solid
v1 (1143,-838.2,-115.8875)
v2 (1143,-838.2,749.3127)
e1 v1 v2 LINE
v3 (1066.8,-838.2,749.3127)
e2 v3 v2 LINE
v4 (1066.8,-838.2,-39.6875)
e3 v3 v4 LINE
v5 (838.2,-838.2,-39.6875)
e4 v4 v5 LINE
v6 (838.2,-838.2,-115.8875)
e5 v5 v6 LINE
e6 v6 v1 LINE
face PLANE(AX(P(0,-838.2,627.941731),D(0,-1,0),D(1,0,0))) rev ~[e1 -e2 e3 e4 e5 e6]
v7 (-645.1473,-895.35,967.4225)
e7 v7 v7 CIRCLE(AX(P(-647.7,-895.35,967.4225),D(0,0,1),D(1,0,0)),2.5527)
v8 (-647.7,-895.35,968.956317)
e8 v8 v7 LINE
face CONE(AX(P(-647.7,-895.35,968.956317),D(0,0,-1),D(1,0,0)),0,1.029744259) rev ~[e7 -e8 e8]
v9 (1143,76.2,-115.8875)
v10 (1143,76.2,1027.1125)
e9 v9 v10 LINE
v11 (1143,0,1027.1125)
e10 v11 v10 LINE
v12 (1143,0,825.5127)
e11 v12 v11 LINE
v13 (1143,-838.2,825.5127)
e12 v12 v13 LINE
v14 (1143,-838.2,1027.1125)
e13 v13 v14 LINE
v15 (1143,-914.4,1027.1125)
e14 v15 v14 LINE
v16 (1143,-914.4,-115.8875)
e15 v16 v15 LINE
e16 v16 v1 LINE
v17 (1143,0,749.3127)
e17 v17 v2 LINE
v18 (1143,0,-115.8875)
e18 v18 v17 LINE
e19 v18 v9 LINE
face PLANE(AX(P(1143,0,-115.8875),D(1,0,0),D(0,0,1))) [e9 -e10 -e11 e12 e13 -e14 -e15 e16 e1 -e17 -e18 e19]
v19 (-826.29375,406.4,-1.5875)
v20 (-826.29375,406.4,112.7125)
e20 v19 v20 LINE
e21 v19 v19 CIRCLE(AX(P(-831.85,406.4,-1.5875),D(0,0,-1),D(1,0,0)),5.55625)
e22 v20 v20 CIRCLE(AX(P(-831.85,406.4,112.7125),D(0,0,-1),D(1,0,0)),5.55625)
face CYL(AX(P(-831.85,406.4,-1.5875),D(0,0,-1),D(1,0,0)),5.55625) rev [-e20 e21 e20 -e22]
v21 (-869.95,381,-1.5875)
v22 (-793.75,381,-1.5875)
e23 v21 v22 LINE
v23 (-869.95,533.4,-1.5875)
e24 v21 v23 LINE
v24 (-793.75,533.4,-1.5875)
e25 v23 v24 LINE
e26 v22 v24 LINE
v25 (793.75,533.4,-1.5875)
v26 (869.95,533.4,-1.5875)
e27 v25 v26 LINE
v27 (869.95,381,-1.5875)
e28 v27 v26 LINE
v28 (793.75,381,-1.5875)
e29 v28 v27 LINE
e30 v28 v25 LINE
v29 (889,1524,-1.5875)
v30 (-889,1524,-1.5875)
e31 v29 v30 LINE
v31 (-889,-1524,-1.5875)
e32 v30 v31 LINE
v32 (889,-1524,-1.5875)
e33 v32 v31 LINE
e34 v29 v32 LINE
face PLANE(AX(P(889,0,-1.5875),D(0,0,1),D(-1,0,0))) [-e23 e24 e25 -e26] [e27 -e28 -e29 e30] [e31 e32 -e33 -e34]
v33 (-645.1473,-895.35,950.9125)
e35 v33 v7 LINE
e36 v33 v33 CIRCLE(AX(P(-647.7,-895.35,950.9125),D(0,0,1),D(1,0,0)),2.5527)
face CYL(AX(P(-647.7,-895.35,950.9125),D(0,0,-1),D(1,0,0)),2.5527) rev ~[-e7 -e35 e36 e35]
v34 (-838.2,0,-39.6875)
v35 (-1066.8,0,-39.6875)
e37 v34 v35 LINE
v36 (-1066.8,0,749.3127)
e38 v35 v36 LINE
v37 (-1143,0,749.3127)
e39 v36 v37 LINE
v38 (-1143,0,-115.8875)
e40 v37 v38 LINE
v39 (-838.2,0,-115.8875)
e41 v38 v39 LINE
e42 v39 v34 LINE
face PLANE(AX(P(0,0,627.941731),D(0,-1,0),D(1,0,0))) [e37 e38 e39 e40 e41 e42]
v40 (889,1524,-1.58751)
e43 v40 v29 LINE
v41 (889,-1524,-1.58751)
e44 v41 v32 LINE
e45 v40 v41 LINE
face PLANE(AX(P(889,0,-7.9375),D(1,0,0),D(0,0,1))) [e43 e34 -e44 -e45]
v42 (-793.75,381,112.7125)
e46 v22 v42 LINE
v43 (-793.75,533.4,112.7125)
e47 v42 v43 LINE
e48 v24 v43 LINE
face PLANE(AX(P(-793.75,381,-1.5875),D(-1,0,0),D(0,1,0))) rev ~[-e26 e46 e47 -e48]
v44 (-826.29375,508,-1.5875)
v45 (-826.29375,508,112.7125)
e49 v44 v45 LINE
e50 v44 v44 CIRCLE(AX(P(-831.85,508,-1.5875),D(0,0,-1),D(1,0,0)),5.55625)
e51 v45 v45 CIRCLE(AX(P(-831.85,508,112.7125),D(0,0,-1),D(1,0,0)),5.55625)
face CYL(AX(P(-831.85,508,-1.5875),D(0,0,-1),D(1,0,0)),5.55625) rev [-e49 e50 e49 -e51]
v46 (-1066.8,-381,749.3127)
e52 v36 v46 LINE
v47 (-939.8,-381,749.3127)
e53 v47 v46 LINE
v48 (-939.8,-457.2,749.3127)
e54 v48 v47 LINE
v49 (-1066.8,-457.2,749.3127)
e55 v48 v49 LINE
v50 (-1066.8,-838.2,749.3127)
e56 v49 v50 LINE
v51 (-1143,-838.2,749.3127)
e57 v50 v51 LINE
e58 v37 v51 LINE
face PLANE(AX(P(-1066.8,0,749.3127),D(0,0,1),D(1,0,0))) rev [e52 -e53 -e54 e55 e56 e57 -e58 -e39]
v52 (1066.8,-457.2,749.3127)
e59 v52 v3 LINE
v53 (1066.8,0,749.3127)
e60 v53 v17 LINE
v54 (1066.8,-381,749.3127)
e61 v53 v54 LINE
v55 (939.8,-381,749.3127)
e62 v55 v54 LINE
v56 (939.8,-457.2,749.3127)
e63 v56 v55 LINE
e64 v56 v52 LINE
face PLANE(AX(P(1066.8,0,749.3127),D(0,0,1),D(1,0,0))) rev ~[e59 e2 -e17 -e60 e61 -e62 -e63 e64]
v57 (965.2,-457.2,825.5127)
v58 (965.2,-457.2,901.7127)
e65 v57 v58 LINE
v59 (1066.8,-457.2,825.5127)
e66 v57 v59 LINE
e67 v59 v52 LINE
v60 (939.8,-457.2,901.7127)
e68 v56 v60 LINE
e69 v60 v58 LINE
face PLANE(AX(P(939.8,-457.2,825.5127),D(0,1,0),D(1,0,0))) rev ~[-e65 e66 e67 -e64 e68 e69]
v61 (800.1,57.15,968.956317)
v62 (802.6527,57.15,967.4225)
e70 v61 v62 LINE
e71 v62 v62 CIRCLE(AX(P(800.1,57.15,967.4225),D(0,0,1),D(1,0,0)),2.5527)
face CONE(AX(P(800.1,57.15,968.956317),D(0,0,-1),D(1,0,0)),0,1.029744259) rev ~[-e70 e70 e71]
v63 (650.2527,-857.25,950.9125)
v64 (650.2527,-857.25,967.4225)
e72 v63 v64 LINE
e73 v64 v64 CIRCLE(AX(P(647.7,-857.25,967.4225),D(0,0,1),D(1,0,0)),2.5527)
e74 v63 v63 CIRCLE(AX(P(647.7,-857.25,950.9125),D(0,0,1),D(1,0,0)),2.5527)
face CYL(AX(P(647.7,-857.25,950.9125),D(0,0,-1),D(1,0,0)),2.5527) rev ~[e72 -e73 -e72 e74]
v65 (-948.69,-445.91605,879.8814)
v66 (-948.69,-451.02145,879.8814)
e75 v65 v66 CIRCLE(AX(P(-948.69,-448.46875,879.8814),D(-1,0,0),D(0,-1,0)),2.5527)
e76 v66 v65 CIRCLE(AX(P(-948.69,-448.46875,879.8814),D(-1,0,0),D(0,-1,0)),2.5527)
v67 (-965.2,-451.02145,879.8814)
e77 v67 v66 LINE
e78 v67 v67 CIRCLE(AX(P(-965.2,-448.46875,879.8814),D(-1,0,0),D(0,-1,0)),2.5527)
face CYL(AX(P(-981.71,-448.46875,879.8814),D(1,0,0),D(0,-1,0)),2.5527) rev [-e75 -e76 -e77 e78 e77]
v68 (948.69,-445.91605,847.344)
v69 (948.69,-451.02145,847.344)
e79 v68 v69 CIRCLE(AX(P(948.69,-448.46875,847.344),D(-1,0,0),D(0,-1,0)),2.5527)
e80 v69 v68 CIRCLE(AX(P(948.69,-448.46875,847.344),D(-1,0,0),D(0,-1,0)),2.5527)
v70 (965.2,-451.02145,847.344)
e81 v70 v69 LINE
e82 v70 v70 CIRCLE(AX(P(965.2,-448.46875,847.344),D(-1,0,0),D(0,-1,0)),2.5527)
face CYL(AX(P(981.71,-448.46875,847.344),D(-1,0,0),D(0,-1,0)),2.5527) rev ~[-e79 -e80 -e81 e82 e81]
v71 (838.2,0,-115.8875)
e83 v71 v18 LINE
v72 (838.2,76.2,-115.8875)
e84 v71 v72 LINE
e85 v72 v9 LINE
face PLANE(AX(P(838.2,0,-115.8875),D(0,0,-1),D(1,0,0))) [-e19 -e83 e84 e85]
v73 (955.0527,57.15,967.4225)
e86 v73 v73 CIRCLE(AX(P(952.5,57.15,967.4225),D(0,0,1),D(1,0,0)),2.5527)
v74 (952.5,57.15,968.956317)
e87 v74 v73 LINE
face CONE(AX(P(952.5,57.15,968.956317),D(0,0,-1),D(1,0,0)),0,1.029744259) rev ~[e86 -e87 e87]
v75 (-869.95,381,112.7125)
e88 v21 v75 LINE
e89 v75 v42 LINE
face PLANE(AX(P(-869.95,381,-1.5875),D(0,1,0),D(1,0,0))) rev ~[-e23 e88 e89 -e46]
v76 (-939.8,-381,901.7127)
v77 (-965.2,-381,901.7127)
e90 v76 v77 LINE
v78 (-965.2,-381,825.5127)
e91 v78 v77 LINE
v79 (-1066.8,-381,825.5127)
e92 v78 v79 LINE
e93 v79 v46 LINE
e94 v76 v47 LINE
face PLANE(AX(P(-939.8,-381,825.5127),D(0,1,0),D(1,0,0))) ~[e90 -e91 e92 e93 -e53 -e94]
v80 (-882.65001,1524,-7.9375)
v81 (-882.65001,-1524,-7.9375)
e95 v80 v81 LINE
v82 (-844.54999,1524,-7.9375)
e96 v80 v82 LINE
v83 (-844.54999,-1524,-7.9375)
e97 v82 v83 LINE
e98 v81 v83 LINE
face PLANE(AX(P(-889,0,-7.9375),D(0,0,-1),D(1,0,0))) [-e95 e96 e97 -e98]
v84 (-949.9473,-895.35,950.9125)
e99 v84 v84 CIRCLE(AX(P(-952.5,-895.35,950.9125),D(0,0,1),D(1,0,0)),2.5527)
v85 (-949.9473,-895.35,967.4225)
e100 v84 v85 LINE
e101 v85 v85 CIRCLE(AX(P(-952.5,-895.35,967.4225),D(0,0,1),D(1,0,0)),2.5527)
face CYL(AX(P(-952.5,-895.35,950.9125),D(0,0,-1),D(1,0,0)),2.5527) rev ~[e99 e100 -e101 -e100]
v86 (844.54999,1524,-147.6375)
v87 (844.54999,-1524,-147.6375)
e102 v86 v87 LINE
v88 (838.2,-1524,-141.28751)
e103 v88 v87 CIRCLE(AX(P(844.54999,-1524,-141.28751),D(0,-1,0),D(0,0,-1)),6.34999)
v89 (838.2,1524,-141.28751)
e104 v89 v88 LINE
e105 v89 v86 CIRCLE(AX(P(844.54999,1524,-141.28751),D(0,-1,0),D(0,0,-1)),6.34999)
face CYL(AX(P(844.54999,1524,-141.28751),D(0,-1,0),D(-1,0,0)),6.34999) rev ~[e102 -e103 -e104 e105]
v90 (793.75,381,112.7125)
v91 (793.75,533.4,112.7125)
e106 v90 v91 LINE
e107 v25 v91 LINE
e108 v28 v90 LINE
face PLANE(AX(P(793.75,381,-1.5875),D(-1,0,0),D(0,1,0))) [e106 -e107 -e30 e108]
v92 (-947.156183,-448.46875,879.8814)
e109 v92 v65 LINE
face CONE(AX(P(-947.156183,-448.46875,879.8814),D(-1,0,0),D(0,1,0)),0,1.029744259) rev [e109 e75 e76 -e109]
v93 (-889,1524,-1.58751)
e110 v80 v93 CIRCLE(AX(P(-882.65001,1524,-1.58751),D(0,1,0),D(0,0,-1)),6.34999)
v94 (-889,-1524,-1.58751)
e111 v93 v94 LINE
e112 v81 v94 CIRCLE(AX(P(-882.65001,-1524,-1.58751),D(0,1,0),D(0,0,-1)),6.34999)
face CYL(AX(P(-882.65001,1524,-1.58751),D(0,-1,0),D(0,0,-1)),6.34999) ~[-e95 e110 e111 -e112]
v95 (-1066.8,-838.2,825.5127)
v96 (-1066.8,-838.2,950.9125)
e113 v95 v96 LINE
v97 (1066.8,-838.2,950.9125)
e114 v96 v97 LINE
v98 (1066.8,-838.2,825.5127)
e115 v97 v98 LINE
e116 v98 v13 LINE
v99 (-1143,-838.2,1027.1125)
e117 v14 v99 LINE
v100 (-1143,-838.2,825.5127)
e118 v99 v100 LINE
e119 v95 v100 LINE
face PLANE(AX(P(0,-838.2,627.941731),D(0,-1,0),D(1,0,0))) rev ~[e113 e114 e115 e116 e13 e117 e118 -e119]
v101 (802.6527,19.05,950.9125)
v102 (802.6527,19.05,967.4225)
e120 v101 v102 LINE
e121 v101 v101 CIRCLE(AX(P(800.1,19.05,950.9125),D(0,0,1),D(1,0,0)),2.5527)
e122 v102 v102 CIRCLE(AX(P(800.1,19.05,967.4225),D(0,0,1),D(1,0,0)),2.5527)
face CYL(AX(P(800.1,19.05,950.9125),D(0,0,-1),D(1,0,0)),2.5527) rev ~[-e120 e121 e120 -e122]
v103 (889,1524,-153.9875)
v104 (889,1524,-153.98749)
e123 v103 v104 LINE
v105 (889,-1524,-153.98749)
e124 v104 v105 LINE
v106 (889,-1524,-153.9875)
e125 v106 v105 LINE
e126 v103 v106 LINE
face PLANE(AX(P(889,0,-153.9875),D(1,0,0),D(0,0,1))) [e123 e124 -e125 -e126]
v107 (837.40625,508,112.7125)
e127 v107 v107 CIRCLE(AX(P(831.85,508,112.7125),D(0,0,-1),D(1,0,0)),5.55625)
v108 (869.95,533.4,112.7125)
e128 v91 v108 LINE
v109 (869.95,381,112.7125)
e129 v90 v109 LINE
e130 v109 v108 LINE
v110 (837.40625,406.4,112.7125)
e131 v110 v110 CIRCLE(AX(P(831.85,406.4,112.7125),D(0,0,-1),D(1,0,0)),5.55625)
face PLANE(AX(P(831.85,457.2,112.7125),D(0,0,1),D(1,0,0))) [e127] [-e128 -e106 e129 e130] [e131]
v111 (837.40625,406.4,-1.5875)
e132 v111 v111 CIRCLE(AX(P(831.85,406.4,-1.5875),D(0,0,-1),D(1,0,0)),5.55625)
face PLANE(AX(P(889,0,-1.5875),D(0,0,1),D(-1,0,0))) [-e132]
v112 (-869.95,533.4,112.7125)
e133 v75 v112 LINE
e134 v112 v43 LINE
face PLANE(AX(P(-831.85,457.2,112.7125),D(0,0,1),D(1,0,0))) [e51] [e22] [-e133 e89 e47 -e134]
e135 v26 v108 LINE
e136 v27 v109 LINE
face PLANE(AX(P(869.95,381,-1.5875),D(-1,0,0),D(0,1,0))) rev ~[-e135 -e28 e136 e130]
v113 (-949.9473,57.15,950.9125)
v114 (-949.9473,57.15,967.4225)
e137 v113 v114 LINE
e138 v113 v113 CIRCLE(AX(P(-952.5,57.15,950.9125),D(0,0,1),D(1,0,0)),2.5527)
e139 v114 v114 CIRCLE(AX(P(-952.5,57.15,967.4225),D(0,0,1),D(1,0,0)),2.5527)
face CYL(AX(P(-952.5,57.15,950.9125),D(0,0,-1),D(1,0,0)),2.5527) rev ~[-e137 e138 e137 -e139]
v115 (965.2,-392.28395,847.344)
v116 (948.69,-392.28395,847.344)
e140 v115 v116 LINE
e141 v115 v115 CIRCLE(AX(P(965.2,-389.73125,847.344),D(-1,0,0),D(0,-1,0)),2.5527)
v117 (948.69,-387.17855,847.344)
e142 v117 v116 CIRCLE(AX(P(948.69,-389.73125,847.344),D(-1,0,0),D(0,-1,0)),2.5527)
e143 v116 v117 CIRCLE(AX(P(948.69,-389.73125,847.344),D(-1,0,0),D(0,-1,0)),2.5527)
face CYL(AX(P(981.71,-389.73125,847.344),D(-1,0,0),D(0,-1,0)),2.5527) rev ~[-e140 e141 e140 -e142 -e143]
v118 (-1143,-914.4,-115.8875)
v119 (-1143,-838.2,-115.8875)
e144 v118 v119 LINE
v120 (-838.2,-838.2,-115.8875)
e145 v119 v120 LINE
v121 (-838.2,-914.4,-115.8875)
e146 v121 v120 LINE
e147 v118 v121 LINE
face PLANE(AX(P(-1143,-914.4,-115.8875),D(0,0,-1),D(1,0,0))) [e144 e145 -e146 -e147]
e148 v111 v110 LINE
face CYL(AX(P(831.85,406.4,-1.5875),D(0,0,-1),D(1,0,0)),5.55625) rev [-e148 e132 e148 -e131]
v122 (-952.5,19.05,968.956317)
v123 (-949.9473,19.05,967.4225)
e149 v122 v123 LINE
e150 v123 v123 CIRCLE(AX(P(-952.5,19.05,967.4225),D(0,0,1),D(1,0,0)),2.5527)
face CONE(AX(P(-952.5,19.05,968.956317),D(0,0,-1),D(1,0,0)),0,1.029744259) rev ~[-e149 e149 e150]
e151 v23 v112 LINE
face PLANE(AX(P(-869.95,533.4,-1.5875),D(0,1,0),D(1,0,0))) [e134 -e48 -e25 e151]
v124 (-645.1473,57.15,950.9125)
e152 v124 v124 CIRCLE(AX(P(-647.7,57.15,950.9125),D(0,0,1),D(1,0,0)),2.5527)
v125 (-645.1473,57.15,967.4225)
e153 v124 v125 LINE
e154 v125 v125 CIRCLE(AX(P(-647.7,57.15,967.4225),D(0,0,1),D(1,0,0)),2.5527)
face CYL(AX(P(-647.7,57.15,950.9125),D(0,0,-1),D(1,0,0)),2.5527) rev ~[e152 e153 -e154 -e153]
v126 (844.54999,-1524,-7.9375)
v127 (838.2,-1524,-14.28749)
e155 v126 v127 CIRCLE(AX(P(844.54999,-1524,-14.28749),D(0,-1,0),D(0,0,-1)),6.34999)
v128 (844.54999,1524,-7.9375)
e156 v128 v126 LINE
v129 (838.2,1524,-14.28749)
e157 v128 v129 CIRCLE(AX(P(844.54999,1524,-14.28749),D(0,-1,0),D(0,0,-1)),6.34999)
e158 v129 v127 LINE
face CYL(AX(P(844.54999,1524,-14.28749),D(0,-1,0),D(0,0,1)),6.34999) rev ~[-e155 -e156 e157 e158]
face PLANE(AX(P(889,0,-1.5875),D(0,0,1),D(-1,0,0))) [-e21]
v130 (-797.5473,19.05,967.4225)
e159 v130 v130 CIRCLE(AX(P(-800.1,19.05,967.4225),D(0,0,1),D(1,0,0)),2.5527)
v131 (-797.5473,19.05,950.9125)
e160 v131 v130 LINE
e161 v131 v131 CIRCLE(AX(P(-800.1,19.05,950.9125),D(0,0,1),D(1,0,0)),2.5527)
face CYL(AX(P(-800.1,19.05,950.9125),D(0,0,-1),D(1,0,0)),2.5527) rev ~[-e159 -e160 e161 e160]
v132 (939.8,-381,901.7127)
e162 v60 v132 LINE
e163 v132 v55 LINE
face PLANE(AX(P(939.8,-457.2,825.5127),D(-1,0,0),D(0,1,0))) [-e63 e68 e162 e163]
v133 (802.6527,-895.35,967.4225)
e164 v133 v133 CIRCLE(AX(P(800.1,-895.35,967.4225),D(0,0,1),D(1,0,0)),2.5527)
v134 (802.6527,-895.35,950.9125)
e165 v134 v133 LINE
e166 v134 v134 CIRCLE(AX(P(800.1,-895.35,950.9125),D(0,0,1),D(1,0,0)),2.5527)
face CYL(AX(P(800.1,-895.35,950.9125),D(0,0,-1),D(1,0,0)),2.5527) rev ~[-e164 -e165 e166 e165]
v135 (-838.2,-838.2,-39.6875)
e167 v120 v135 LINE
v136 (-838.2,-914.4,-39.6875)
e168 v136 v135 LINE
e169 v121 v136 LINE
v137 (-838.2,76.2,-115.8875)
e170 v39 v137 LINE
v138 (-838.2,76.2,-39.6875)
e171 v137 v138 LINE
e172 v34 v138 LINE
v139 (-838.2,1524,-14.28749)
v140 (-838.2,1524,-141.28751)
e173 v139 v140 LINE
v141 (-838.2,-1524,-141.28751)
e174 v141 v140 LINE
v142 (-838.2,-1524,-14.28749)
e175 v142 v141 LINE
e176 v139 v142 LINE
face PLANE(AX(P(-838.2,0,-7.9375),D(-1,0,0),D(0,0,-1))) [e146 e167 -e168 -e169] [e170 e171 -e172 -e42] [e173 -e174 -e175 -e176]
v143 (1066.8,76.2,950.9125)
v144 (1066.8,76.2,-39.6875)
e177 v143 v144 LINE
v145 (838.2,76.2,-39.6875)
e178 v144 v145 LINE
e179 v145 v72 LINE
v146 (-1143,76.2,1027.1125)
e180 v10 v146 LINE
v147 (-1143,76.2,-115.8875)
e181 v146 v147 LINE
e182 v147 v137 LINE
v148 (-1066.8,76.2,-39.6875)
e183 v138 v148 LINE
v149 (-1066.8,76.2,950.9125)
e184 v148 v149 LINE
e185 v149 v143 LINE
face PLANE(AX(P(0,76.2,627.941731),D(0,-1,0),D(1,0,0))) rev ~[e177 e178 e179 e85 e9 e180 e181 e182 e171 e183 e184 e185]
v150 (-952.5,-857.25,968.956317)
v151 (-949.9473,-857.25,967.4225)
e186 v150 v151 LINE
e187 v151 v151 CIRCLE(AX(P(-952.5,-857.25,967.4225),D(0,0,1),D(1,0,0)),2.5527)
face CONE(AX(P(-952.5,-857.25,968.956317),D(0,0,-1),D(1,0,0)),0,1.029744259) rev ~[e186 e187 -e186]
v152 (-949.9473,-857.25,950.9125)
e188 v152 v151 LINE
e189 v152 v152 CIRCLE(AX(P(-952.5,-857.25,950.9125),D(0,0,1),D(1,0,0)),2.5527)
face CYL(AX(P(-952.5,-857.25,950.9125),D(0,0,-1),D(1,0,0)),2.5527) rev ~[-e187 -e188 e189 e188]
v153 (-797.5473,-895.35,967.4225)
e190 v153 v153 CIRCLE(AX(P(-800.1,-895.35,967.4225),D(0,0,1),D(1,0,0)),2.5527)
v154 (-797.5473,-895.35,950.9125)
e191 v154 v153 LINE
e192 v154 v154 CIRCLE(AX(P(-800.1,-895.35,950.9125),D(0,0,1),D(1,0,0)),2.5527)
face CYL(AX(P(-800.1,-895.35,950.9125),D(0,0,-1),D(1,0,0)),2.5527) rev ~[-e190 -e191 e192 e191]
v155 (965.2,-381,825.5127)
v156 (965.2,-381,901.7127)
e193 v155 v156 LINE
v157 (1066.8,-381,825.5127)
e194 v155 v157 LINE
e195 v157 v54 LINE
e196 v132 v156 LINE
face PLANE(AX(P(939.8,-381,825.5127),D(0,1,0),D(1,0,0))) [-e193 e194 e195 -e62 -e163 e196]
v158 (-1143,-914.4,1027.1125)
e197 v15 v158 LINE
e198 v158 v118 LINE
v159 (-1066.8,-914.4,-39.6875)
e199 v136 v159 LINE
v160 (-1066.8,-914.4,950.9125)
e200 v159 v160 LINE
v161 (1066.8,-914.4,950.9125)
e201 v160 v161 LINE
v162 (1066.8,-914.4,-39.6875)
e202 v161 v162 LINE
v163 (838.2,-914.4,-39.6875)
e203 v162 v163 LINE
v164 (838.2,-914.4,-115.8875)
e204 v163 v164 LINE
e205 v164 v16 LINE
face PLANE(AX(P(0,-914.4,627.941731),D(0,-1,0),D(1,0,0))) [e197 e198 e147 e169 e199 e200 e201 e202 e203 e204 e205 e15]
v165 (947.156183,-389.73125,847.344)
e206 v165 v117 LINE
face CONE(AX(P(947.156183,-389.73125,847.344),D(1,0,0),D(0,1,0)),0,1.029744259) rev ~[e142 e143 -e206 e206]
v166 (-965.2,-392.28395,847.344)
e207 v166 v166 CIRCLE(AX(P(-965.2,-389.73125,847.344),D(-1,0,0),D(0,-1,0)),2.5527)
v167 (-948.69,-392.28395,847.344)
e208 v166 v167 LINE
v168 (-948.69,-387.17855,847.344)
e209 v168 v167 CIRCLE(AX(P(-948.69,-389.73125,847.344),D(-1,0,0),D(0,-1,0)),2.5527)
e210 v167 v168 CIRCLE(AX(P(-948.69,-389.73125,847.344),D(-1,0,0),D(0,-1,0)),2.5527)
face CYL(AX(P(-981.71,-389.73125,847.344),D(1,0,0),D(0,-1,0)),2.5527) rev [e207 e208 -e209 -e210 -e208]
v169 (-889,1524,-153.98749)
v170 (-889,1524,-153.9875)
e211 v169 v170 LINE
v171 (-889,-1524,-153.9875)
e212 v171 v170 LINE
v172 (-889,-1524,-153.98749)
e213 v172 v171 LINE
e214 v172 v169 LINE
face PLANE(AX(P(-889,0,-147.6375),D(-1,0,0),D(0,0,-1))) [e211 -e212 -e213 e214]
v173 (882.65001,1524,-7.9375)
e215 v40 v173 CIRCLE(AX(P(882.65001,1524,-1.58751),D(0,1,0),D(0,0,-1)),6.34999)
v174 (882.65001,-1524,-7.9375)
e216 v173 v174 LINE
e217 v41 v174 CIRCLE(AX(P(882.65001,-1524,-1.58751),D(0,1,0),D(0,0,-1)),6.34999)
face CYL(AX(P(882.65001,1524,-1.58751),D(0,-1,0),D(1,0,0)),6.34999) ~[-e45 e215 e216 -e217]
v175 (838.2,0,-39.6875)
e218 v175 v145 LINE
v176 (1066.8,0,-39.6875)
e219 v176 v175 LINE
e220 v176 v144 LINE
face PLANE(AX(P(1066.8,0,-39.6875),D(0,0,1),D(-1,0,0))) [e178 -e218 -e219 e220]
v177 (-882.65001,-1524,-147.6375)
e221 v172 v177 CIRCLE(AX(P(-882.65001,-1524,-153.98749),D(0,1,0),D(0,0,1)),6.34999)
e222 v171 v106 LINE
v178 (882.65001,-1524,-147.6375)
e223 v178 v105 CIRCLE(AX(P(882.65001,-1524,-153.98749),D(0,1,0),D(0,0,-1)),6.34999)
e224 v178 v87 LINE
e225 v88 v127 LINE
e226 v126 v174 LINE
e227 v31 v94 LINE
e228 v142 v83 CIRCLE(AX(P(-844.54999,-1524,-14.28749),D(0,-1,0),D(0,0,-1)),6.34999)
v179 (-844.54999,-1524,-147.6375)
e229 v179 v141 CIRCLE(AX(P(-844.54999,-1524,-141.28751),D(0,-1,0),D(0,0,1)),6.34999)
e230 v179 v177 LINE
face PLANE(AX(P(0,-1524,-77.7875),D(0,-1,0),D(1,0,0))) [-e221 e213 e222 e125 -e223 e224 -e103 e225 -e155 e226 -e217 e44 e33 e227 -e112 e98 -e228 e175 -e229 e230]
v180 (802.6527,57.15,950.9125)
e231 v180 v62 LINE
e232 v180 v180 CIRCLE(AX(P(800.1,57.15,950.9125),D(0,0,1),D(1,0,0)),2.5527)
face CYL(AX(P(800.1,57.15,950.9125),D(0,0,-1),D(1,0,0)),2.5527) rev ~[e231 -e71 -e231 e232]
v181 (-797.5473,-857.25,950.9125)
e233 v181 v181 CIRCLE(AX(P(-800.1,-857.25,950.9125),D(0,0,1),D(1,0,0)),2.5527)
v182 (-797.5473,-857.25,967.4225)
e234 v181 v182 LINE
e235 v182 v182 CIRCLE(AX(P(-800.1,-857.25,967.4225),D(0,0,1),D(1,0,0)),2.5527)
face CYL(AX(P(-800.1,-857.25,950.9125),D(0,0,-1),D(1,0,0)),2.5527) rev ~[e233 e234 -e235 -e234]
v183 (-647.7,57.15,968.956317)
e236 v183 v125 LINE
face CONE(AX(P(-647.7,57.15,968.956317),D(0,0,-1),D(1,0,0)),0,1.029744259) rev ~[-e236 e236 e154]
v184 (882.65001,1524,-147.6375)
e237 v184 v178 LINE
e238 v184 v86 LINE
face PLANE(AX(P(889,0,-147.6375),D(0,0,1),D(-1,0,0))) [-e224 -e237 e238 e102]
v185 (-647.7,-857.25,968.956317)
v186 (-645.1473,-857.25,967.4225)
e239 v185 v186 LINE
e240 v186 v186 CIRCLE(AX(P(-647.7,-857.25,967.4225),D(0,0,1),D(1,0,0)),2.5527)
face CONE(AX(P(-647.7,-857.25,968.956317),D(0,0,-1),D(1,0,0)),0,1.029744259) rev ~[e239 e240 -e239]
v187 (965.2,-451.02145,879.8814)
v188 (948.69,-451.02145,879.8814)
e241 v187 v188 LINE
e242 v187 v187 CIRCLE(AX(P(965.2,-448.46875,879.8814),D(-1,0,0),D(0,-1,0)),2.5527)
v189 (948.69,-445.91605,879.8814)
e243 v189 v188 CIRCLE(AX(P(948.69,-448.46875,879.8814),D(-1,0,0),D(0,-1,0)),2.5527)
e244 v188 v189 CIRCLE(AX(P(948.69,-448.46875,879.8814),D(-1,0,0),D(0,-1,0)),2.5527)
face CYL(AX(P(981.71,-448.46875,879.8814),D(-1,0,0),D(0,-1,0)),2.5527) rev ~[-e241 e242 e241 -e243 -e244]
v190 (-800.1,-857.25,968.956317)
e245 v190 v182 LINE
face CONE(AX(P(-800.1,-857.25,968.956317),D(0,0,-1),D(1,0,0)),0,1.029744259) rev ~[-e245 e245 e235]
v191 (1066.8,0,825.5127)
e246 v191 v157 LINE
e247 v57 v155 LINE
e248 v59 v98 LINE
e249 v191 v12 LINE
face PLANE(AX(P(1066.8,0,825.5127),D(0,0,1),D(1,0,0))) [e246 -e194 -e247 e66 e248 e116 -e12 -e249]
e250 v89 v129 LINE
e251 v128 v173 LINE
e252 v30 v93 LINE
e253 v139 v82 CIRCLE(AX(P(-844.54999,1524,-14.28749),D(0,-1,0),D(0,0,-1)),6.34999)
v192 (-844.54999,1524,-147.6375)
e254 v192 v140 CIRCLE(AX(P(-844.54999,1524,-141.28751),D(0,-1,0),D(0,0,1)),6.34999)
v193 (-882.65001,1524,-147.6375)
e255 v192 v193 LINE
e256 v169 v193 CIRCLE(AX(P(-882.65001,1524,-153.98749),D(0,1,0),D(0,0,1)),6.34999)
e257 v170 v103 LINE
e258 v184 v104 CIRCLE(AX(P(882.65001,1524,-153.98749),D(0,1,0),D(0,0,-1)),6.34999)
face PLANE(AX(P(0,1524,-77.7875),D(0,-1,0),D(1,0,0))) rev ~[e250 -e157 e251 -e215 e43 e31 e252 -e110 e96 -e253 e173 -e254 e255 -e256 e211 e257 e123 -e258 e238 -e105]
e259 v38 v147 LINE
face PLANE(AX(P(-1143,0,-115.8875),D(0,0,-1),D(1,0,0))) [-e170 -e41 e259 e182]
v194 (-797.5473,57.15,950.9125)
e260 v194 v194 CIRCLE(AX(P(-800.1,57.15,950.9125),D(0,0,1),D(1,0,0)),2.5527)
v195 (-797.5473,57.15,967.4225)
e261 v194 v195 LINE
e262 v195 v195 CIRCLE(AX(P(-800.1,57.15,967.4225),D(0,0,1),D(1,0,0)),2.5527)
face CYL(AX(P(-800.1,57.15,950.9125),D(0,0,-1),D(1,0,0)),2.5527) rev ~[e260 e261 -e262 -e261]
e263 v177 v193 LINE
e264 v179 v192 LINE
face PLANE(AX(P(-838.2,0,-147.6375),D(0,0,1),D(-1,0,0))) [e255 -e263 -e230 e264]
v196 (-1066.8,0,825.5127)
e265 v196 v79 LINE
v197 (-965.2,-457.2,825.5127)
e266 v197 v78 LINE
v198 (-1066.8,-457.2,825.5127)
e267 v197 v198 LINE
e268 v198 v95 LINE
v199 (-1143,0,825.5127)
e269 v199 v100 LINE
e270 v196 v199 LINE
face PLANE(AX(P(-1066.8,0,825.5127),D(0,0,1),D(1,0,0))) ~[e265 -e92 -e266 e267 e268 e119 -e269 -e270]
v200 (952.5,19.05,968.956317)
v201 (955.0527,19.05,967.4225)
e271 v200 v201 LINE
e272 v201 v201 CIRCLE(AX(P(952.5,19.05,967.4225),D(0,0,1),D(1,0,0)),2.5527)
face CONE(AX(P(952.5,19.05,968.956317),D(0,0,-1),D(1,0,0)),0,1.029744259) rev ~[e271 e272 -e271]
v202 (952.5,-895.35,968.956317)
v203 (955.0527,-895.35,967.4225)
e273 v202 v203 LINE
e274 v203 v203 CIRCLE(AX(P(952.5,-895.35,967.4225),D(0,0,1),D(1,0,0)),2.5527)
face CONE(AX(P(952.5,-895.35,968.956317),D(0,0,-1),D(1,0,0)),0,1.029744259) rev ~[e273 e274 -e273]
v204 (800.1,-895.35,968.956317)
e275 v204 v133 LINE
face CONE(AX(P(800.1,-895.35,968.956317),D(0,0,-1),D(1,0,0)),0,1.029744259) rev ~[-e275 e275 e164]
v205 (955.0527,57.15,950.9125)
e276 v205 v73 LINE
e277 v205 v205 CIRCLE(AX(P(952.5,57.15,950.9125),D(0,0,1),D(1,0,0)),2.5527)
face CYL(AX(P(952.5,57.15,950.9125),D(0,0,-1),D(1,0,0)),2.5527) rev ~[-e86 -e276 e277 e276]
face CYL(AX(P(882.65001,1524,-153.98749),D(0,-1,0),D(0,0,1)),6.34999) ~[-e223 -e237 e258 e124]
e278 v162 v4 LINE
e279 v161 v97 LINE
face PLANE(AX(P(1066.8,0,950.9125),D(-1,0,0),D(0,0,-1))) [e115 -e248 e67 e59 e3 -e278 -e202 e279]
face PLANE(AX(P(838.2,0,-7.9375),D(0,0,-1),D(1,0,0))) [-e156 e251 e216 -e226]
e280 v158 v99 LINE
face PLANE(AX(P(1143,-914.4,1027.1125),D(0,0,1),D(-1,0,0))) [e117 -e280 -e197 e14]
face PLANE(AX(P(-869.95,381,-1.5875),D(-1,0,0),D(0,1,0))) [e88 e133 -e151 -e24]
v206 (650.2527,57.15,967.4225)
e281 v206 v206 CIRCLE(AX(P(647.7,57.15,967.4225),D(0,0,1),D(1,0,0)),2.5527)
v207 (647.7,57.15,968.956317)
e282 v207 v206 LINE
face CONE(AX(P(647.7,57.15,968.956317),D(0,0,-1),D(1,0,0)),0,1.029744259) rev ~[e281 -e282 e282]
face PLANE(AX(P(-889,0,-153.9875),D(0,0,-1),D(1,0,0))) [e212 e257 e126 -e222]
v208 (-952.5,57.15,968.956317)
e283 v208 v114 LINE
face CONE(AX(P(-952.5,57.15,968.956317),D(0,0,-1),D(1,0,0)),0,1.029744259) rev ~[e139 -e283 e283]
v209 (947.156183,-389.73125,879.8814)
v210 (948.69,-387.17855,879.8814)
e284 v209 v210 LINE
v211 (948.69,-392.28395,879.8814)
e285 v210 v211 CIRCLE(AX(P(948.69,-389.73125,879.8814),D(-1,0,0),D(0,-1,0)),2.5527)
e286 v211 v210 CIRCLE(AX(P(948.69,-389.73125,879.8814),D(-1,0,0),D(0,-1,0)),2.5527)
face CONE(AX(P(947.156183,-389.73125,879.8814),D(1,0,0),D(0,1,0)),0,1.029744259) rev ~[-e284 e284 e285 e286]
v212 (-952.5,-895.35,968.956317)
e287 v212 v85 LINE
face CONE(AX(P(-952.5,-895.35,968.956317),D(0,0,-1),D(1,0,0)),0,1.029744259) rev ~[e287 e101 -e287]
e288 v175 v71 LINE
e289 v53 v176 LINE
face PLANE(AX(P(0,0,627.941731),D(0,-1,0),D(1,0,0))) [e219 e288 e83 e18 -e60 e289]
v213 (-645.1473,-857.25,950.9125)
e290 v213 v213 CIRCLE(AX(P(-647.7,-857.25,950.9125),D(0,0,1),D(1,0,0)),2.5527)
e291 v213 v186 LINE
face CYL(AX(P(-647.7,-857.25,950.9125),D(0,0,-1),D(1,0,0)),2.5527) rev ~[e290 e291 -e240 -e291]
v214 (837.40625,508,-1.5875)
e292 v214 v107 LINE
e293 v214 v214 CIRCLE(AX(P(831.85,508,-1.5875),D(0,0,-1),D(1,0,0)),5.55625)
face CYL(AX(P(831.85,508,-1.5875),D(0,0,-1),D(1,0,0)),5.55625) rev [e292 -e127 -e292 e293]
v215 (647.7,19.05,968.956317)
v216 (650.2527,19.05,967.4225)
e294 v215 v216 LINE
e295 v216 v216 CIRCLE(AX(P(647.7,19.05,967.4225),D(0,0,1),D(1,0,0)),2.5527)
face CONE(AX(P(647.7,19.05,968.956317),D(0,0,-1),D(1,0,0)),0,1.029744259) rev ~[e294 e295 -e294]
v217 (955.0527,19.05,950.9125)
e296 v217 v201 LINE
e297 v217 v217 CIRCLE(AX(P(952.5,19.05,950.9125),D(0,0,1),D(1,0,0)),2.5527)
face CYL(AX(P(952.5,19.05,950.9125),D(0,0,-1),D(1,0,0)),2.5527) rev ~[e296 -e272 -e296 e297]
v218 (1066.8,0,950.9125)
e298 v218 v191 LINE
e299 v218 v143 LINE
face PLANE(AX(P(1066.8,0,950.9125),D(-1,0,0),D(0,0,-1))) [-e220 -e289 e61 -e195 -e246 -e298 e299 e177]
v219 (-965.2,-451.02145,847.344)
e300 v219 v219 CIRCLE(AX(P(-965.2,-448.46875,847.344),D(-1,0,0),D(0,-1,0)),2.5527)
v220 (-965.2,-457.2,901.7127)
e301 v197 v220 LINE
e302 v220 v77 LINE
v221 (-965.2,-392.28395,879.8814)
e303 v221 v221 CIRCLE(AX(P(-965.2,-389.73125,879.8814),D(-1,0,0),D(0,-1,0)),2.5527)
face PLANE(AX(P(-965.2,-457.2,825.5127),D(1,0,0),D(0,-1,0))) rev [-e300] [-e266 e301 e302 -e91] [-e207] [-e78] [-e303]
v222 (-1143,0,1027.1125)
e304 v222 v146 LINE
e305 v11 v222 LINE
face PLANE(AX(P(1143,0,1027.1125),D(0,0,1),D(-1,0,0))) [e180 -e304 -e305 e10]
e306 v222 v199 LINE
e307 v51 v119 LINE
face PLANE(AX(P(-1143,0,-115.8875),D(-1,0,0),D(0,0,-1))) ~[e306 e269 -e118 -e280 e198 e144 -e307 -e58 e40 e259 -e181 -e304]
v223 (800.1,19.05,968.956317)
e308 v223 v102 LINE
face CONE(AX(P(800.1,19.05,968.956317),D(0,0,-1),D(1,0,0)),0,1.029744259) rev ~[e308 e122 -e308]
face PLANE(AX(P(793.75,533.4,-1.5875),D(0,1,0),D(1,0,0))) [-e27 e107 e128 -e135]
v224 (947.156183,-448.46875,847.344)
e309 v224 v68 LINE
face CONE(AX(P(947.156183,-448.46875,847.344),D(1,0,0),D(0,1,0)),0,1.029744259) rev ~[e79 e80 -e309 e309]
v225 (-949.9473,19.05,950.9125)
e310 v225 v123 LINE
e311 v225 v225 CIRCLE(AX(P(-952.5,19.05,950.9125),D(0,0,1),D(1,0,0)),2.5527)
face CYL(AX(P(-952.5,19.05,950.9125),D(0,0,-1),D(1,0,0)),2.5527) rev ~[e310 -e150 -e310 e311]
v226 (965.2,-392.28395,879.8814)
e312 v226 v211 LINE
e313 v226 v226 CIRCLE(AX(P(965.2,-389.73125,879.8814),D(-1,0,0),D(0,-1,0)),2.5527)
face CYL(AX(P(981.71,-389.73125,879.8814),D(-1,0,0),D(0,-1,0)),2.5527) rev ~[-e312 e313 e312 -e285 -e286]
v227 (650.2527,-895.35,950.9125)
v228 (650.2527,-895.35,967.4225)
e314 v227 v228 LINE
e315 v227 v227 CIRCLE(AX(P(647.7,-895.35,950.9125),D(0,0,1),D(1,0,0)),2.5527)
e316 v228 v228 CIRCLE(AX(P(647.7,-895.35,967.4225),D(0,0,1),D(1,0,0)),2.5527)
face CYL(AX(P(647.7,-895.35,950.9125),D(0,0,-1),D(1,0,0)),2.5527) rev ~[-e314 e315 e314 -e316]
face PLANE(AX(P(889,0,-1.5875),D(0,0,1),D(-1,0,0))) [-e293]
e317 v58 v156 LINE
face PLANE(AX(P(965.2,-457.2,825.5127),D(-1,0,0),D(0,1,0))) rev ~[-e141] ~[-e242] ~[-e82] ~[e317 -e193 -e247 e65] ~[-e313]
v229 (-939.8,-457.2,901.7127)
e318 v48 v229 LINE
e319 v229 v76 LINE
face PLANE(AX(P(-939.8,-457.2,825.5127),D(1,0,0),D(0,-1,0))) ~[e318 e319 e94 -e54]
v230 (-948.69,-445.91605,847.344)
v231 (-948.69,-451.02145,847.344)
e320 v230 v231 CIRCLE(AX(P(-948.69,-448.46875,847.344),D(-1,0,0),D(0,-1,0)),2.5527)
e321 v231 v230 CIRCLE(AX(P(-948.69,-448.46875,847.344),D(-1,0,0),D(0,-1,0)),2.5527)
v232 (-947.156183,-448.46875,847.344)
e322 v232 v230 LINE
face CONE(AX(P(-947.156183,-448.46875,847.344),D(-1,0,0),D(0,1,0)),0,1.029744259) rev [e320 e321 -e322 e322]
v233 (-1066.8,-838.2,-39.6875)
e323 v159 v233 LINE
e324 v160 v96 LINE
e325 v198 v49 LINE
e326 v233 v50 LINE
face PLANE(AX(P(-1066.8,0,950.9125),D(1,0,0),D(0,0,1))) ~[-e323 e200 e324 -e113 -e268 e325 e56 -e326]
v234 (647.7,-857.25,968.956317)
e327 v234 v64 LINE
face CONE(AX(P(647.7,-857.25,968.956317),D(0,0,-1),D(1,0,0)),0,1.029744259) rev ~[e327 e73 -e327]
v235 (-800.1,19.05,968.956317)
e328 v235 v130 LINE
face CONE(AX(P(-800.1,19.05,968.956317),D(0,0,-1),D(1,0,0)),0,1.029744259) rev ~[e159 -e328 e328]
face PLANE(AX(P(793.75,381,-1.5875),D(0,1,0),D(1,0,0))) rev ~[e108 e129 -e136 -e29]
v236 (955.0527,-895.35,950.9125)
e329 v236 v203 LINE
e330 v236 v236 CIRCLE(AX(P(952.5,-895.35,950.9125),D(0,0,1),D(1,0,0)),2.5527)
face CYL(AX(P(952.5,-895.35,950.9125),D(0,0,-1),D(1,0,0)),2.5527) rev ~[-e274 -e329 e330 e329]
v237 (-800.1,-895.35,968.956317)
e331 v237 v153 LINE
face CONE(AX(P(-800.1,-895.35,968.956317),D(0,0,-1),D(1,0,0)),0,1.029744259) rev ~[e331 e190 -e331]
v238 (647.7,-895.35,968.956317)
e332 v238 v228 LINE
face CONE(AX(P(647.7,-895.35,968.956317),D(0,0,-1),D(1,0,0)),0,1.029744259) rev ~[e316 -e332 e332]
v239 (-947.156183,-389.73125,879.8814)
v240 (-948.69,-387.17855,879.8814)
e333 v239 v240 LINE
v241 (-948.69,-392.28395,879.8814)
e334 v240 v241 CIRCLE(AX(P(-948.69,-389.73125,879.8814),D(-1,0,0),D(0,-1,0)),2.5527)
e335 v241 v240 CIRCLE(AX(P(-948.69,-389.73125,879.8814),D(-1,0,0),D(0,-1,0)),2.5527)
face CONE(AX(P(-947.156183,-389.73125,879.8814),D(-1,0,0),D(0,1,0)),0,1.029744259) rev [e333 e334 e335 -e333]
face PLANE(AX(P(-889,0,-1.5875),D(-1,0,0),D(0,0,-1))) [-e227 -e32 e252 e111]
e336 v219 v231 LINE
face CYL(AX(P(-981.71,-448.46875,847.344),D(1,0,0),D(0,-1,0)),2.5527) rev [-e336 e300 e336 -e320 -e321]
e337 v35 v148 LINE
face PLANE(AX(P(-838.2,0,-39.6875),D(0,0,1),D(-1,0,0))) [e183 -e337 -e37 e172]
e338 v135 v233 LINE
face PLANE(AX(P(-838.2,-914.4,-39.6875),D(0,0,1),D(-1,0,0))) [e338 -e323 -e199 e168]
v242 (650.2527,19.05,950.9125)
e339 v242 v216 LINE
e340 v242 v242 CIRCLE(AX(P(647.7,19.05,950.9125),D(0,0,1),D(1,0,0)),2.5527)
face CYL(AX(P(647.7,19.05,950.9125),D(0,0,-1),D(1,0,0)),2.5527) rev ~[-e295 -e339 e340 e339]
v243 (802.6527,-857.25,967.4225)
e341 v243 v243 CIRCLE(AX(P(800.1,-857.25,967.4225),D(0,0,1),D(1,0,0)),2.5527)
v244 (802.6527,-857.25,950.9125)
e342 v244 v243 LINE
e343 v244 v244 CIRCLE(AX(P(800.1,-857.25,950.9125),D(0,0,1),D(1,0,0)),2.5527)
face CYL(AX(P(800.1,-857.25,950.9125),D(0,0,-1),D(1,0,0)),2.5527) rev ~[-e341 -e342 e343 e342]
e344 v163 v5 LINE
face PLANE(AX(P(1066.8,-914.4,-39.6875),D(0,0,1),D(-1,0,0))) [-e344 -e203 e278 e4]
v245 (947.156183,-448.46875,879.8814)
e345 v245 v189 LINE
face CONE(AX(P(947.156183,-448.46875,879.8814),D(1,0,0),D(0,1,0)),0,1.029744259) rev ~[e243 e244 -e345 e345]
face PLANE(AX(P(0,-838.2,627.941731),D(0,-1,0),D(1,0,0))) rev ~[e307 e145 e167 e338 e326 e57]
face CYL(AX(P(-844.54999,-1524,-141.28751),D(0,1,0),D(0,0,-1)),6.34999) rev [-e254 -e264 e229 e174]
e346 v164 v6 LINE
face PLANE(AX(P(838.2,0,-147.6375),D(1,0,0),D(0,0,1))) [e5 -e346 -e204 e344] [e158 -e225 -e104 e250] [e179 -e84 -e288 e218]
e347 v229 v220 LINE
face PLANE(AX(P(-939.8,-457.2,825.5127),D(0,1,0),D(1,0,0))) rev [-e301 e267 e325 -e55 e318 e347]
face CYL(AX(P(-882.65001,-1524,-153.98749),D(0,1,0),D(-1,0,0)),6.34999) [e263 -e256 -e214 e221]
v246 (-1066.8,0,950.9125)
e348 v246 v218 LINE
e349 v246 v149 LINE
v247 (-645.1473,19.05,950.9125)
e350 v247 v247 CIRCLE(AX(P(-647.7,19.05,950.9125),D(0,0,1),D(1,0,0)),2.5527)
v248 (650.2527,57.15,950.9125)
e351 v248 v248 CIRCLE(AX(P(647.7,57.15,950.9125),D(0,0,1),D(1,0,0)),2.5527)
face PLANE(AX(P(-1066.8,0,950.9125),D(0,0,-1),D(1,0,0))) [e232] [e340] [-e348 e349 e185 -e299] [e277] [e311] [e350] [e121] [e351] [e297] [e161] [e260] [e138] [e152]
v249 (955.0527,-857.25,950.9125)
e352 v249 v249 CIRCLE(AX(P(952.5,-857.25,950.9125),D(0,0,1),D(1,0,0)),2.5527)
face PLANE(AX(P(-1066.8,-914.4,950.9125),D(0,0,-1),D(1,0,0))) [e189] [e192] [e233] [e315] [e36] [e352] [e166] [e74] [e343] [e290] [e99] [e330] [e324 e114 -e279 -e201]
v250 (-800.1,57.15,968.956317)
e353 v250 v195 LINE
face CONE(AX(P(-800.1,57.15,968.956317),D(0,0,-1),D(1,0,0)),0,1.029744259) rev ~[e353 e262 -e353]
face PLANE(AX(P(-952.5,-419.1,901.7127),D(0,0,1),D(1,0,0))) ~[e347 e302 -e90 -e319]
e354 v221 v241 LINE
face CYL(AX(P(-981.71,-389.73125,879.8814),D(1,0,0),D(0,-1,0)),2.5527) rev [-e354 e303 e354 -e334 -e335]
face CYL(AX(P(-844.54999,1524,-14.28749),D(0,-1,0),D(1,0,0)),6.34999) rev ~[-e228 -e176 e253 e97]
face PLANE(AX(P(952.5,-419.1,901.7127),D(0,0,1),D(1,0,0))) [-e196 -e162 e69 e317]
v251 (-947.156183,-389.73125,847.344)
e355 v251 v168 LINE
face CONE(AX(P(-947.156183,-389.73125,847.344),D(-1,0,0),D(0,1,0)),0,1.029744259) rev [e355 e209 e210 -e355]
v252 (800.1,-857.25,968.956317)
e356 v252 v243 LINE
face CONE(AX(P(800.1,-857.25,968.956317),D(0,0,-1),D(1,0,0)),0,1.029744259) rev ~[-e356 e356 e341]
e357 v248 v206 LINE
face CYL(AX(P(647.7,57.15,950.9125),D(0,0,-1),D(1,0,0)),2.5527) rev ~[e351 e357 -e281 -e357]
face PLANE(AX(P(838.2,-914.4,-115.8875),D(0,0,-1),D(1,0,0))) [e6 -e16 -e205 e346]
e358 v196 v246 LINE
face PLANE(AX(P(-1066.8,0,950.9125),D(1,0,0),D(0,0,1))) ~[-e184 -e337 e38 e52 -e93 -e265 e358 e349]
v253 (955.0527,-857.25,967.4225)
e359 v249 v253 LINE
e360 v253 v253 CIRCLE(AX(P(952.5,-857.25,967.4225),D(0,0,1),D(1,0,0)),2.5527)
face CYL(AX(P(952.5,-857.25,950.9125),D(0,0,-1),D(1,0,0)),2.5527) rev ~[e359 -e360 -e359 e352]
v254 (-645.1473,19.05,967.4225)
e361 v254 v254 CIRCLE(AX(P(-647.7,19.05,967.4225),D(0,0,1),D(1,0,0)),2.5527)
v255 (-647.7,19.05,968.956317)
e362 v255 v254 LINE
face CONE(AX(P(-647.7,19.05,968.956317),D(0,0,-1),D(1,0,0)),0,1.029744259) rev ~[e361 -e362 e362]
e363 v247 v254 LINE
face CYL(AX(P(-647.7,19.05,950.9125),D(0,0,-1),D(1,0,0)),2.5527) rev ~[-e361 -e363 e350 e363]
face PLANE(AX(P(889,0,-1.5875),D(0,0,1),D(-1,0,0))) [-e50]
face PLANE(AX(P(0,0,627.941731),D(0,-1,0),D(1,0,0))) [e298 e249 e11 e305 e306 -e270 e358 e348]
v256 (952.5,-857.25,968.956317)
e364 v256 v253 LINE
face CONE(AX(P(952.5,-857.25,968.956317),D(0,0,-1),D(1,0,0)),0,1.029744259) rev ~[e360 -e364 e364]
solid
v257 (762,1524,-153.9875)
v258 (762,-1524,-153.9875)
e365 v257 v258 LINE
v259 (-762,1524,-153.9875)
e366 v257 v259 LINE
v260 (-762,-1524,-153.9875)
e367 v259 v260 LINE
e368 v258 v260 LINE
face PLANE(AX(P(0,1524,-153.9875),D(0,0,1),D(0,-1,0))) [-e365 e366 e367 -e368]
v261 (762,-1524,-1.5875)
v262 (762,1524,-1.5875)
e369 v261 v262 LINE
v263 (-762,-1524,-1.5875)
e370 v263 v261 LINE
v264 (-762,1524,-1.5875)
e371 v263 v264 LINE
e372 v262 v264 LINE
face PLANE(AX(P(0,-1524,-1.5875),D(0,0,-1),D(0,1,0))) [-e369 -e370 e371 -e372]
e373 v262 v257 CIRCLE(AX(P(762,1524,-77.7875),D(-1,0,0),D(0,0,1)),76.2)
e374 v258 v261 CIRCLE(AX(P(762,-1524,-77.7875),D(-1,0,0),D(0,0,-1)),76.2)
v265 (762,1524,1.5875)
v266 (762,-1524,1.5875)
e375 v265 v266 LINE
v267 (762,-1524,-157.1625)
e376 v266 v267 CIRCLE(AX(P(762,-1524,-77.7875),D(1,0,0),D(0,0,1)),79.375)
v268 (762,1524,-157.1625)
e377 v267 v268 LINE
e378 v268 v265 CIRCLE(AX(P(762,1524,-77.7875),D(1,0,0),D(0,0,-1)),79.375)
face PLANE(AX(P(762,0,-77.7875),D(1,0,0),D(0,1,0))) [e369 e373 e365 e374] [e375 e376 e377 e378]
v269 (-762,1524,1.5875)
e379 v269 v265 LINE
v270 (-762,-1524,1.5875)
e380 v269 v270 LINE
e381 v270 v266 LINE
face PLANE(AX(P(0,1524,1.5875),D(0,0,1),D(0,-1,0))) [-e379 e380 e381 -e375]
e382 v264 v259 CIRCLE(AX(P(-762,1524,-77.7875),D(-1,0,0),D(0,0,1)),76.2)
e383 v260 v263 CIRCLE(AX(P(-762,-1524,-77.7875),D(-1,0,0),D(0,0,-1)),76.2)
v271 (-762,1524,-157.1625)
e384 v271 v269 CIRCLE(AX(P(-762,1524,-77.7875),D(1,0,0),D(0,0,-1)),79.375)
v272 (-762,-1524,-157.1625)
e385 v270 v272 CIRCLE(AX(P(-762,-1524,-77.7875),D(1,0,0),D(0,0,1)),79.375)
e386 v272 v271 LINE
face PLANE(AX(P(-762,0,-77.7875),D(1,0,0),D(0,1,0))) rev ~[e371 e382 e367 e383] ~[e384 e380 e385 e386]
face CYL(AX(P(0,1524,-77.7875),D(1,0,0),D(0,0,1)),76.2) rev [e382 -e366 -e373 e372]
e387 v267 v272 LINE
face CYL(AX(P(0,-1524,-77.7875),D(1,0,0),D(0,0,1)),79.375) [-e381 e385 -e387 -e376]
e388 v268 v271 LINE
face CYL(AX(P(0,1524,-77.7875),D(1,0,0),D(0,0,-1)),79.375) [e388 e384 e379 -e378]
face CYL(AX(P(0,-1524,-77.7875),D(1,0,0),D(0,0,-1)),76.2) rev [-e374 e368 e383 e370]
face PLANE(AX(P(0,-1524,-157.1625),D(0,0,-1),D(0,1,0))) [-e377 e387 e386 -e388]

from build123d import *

# Parameters (mm, degrees)
F1_DEPTH  = 762
F3_DEPTH  = 1524
F4_R      = 6.34999
F5_W      = 76.2
F5_H      = 152.4
F5_R      = 5.55625
F6_DEPTH  = 114.3
F8_DEPTH  = 76.2
F11_DEPTH = 76.2
F13_D     = 5.1054
F13_DEPTH = 16.51
F13_TIP   = 1.5338169022
F14_W     = 76.2
F14_H     = 76.2
F15_DEPTH = 838.2
F16_W     = 127
F16_H     = 76.2
F17_DEPTH = 76.2
F18_W     = 25.4
F18_H     = 76.2
F19_DEPTH = 76.2
F21_D     = 5.1054
F21_DEPTH = 16.51
F21_TIP   = 1.5338169022


# Not quite as in the source:
# - a fillet or chamfer is up to 0.001 mm smaller than in the source, because OpenCascade refuses the exact size


with BuildPart() as f1:
    # F0 (on Right) → F1 (new body, symmetric)
    with BuildSketch(Plane.YZ):
        with BuildLine():
            ThreePointArc((1524, -157.1625), (1603.375, -77.7875), (1524, 1.5875))
            Line((1524, 1.5875), (-1524, 1.5875))
            ThreePointArc((-1524, 1.5875), (-1603.375, -77.7875), (-1524, -157.1625))
            Line((-1524, -157.1625), (1524, -157.1625))
        make_face()
        with BuildLine():
            Line((-1524, -1.5875), (1524, -1.5875))
            ThreePointArc((1524, -1.5875), (1600.2, -77.7875), (1524, -153.9875))
            Line((1524, -153.9875), (-1524, -153.9875))
            ThreePointArc((-1524, -153.9875), (-1600.2, -77.7875), (-1524, -1.5875))
        make_face(mode=Mode.SUBTRACT)
    extrude(amount=F1_DEPTH, both=True)


with BuildPart() as f3:
    # F2 (on Front) → F3 (new body, symmetric)
    with BuildSketch(Plane.XZ):
        Polygon((-889, -153.9875), (889, -153.9875), (889, -147.6375), (838.2, -147.6375), (838.2, -7.9375), (889, -7.9375), (889, -1.5875), (-889, -1.5875), (-889, -7.9375), (-838.2, -7.9375), (-838.2, -147.6375), (-889, -147.6375), align=None)
    extrude(amount=F3_DEPTH, both=True)

    # F4 (radius 6.35 in the source; OpenCascade refuses exactly that, so slightly less here)
    f4_edges = [f3.edges().sort_by_distance(p)[0] for p in [
        (-889, 0, -7.9375),
        (-838.2, 0, -7.9375),
        (-838.2, 0, -147.6375),
        (-889, 0, -147.6375),
        (889, 0, -7.9375),
        (838.2, 0, -147.6375),
        (889, 0, -147.6375),
        (838.2, 0, -7.9375),
    ]]
    fillet(f4_edges, radius=F4_R)

    # F5 (on face) → F6 (join)
    with BuildSketch(Plane.XY.offset(-1.5875)):
        with Locations((831.85, 457.2)):
            Rectangle(F5_W, F5_H)
        with Locations((831.85, 406.4)):
            Circle(F5_R, mode=Mode.SUBTRACT)
        with Locations((831.85, 508)):
            Circle(F5_R, mode=Mode.SUBTRACT)
        with Locations((-831.85, 457.2)):
            Rectangle(F5_W, F5_H)
        with Locations((-831.85, 406.4)):
            Circle(F5_R, mode=Mode.SUBTRACT)
        with Locations((-831.85, 508)):
            Circle(F5_R, mode=Mode.SUBTRACT)
    extrude(amount=F6_DEPTH)

    # F7 (on Front) → F8 (join)
    with BuildSketch(Plane.XZ):
        Polygon((1066.8, -39.6875), (838.2, -39.6875), (838.2, -115.8875), (1143, -115.8875), (1143, 1027.1125), (-1143, 1027.1125), (-1143, -115.8875), (-838.2, -115.8875), (-838.2, -39.6875), (-1066.8, -39.6875), (-1066.8, 950.9125), (1066.8, 950.9125), align=None)
    extrude(amount=-F8_DEPTH)

    # F10 (on offset) → F11 (join)
    with BuildSketch(Plane.XZ.offset(914.4)):
        Polygon((1066.8, -39.6875), (838.2, -39.6875), (838.2, -115.8875), (1143, -115.8875), (1143, 1027.1125), (-1143, 1027.1125), (-1143, -115.8875), (-838.2, -115.8875), (-838.2, -39.6875), (-1066.8, -39.6875), (-1066.8, 950.9125), (1066.8, 950.9125), align=None)
    extrude(amount=-F11_DEPTH)

    # F13 (one way)
    with BuildSketch(Plane(origin=(0, 0, 950.9125), x_dir=(1, 0, 0), z_dir=(0, 0, -1))):
        with Locations((-952.5, -19.05), (-952.5, -57.15), (-800.1, -19.05), (-800.1, -57.15), (-647.7, -57.15), (-647.7, -19.05), (647.7, -57.15), (647.7, -19.05), (800.1, -57.15), (800.1, -19.05), (952.5, -19.05), (952.5, -57.15), (-952.5, 857.25), (-952.5, 895.35), (-800.1, 895.35), (-800.1, 857.25), (-647.7, 857.25), (-647.7, 895.35), (647.7, 895.35), (647.7, 857.25), (800.1, 857.25), (800.1, 895.35), (952.5, 895.35), (952.5, 857.25)):
            Circle(F13_D / 2)
    extrude(amount=-F13_DEPTH, mode=Mode.SUBTRACT)
    with Locations(Plane(origin=(0, 0, 950.9125), x_dir=(1, 0, 0), z_dir=(0, 0, -1))):
        with Locations((-952.5, -19.05), (-952.5, -57.15), (-800.1, -19.05), (-800.1, -57.15), (-647.7, -57.15), (-647.7, -19.05), (647.7, -57.15), (647.7, -19.05), (800.1, -57.15), (800.1, -19.05), (952.5, -19.05), (952.5, -57.15), (-952.5, 857.25), (-952.5, 895.35), (-800.1, 895.35), (-800.1, 857.25), (-647.7, 857.25), (-647.7, 895.35), (647.7, 895.35), (647.7, 857.25), (800.1, 857.25), (800.1, 895.35), (952.5, 895.35), (952.5, 857.25)):
            with Locations((0, 0, -(F13_DEPTH + F13_TIP / 2))):  # 118° drill point
                Cone(0, F13_D / 2, F13_TIP, mode=Mode.SUBTRACT)

    # F14 (on face) → F15 (join, through all)
    with BuildSketch(Plane.XZ):
        with Locations((1104.9, 787.4127)):
            Rectangle(F14_W, F14_H)
    extrude(amount=F15_DEPTH)

    # F16 (on face) → F17 (join, through all)
    with BuildSketch(Plane.XY.offset(825.5127)):
        with Locations((1003.3, -419.1)):
            Rectangle(F16_W, F16_H)
    extrude(amount=-F17_DEPTH)

    # F18 (on face) → F19 (join)
    with BuildSketch(Plane.XY.offset(825.5127)):
        with Locations((952.5, -419.1)):
            Rectangle(F18_W, F18_H)
    extrude(amount=F19_DEPTH)

    # F21
    with Locations(Plane.YZ.offset(965.2)):
        with Locations((-448.46875, 879.8814), (-448.46875, 847.344), (-389.73125, 847.344), (-389.73125, 879.8814)):
            Hole(F21_D / 2, depth=F21_DEPTH)
            with Locations((0, 0, -(F21_DEPTH + F21_TIP / 2))):  # 118° drill point
                Cone(0, F21_D / 2, F21_TIP, mode=Mode.SUBTRACT)

    # F22: F3 across plane


with BuildPart() as f3_1:
    add(f3.part)
    add(f3.part.mirror(Plane.YZ))


solid = Compound([f1.part, f3_1.part])
